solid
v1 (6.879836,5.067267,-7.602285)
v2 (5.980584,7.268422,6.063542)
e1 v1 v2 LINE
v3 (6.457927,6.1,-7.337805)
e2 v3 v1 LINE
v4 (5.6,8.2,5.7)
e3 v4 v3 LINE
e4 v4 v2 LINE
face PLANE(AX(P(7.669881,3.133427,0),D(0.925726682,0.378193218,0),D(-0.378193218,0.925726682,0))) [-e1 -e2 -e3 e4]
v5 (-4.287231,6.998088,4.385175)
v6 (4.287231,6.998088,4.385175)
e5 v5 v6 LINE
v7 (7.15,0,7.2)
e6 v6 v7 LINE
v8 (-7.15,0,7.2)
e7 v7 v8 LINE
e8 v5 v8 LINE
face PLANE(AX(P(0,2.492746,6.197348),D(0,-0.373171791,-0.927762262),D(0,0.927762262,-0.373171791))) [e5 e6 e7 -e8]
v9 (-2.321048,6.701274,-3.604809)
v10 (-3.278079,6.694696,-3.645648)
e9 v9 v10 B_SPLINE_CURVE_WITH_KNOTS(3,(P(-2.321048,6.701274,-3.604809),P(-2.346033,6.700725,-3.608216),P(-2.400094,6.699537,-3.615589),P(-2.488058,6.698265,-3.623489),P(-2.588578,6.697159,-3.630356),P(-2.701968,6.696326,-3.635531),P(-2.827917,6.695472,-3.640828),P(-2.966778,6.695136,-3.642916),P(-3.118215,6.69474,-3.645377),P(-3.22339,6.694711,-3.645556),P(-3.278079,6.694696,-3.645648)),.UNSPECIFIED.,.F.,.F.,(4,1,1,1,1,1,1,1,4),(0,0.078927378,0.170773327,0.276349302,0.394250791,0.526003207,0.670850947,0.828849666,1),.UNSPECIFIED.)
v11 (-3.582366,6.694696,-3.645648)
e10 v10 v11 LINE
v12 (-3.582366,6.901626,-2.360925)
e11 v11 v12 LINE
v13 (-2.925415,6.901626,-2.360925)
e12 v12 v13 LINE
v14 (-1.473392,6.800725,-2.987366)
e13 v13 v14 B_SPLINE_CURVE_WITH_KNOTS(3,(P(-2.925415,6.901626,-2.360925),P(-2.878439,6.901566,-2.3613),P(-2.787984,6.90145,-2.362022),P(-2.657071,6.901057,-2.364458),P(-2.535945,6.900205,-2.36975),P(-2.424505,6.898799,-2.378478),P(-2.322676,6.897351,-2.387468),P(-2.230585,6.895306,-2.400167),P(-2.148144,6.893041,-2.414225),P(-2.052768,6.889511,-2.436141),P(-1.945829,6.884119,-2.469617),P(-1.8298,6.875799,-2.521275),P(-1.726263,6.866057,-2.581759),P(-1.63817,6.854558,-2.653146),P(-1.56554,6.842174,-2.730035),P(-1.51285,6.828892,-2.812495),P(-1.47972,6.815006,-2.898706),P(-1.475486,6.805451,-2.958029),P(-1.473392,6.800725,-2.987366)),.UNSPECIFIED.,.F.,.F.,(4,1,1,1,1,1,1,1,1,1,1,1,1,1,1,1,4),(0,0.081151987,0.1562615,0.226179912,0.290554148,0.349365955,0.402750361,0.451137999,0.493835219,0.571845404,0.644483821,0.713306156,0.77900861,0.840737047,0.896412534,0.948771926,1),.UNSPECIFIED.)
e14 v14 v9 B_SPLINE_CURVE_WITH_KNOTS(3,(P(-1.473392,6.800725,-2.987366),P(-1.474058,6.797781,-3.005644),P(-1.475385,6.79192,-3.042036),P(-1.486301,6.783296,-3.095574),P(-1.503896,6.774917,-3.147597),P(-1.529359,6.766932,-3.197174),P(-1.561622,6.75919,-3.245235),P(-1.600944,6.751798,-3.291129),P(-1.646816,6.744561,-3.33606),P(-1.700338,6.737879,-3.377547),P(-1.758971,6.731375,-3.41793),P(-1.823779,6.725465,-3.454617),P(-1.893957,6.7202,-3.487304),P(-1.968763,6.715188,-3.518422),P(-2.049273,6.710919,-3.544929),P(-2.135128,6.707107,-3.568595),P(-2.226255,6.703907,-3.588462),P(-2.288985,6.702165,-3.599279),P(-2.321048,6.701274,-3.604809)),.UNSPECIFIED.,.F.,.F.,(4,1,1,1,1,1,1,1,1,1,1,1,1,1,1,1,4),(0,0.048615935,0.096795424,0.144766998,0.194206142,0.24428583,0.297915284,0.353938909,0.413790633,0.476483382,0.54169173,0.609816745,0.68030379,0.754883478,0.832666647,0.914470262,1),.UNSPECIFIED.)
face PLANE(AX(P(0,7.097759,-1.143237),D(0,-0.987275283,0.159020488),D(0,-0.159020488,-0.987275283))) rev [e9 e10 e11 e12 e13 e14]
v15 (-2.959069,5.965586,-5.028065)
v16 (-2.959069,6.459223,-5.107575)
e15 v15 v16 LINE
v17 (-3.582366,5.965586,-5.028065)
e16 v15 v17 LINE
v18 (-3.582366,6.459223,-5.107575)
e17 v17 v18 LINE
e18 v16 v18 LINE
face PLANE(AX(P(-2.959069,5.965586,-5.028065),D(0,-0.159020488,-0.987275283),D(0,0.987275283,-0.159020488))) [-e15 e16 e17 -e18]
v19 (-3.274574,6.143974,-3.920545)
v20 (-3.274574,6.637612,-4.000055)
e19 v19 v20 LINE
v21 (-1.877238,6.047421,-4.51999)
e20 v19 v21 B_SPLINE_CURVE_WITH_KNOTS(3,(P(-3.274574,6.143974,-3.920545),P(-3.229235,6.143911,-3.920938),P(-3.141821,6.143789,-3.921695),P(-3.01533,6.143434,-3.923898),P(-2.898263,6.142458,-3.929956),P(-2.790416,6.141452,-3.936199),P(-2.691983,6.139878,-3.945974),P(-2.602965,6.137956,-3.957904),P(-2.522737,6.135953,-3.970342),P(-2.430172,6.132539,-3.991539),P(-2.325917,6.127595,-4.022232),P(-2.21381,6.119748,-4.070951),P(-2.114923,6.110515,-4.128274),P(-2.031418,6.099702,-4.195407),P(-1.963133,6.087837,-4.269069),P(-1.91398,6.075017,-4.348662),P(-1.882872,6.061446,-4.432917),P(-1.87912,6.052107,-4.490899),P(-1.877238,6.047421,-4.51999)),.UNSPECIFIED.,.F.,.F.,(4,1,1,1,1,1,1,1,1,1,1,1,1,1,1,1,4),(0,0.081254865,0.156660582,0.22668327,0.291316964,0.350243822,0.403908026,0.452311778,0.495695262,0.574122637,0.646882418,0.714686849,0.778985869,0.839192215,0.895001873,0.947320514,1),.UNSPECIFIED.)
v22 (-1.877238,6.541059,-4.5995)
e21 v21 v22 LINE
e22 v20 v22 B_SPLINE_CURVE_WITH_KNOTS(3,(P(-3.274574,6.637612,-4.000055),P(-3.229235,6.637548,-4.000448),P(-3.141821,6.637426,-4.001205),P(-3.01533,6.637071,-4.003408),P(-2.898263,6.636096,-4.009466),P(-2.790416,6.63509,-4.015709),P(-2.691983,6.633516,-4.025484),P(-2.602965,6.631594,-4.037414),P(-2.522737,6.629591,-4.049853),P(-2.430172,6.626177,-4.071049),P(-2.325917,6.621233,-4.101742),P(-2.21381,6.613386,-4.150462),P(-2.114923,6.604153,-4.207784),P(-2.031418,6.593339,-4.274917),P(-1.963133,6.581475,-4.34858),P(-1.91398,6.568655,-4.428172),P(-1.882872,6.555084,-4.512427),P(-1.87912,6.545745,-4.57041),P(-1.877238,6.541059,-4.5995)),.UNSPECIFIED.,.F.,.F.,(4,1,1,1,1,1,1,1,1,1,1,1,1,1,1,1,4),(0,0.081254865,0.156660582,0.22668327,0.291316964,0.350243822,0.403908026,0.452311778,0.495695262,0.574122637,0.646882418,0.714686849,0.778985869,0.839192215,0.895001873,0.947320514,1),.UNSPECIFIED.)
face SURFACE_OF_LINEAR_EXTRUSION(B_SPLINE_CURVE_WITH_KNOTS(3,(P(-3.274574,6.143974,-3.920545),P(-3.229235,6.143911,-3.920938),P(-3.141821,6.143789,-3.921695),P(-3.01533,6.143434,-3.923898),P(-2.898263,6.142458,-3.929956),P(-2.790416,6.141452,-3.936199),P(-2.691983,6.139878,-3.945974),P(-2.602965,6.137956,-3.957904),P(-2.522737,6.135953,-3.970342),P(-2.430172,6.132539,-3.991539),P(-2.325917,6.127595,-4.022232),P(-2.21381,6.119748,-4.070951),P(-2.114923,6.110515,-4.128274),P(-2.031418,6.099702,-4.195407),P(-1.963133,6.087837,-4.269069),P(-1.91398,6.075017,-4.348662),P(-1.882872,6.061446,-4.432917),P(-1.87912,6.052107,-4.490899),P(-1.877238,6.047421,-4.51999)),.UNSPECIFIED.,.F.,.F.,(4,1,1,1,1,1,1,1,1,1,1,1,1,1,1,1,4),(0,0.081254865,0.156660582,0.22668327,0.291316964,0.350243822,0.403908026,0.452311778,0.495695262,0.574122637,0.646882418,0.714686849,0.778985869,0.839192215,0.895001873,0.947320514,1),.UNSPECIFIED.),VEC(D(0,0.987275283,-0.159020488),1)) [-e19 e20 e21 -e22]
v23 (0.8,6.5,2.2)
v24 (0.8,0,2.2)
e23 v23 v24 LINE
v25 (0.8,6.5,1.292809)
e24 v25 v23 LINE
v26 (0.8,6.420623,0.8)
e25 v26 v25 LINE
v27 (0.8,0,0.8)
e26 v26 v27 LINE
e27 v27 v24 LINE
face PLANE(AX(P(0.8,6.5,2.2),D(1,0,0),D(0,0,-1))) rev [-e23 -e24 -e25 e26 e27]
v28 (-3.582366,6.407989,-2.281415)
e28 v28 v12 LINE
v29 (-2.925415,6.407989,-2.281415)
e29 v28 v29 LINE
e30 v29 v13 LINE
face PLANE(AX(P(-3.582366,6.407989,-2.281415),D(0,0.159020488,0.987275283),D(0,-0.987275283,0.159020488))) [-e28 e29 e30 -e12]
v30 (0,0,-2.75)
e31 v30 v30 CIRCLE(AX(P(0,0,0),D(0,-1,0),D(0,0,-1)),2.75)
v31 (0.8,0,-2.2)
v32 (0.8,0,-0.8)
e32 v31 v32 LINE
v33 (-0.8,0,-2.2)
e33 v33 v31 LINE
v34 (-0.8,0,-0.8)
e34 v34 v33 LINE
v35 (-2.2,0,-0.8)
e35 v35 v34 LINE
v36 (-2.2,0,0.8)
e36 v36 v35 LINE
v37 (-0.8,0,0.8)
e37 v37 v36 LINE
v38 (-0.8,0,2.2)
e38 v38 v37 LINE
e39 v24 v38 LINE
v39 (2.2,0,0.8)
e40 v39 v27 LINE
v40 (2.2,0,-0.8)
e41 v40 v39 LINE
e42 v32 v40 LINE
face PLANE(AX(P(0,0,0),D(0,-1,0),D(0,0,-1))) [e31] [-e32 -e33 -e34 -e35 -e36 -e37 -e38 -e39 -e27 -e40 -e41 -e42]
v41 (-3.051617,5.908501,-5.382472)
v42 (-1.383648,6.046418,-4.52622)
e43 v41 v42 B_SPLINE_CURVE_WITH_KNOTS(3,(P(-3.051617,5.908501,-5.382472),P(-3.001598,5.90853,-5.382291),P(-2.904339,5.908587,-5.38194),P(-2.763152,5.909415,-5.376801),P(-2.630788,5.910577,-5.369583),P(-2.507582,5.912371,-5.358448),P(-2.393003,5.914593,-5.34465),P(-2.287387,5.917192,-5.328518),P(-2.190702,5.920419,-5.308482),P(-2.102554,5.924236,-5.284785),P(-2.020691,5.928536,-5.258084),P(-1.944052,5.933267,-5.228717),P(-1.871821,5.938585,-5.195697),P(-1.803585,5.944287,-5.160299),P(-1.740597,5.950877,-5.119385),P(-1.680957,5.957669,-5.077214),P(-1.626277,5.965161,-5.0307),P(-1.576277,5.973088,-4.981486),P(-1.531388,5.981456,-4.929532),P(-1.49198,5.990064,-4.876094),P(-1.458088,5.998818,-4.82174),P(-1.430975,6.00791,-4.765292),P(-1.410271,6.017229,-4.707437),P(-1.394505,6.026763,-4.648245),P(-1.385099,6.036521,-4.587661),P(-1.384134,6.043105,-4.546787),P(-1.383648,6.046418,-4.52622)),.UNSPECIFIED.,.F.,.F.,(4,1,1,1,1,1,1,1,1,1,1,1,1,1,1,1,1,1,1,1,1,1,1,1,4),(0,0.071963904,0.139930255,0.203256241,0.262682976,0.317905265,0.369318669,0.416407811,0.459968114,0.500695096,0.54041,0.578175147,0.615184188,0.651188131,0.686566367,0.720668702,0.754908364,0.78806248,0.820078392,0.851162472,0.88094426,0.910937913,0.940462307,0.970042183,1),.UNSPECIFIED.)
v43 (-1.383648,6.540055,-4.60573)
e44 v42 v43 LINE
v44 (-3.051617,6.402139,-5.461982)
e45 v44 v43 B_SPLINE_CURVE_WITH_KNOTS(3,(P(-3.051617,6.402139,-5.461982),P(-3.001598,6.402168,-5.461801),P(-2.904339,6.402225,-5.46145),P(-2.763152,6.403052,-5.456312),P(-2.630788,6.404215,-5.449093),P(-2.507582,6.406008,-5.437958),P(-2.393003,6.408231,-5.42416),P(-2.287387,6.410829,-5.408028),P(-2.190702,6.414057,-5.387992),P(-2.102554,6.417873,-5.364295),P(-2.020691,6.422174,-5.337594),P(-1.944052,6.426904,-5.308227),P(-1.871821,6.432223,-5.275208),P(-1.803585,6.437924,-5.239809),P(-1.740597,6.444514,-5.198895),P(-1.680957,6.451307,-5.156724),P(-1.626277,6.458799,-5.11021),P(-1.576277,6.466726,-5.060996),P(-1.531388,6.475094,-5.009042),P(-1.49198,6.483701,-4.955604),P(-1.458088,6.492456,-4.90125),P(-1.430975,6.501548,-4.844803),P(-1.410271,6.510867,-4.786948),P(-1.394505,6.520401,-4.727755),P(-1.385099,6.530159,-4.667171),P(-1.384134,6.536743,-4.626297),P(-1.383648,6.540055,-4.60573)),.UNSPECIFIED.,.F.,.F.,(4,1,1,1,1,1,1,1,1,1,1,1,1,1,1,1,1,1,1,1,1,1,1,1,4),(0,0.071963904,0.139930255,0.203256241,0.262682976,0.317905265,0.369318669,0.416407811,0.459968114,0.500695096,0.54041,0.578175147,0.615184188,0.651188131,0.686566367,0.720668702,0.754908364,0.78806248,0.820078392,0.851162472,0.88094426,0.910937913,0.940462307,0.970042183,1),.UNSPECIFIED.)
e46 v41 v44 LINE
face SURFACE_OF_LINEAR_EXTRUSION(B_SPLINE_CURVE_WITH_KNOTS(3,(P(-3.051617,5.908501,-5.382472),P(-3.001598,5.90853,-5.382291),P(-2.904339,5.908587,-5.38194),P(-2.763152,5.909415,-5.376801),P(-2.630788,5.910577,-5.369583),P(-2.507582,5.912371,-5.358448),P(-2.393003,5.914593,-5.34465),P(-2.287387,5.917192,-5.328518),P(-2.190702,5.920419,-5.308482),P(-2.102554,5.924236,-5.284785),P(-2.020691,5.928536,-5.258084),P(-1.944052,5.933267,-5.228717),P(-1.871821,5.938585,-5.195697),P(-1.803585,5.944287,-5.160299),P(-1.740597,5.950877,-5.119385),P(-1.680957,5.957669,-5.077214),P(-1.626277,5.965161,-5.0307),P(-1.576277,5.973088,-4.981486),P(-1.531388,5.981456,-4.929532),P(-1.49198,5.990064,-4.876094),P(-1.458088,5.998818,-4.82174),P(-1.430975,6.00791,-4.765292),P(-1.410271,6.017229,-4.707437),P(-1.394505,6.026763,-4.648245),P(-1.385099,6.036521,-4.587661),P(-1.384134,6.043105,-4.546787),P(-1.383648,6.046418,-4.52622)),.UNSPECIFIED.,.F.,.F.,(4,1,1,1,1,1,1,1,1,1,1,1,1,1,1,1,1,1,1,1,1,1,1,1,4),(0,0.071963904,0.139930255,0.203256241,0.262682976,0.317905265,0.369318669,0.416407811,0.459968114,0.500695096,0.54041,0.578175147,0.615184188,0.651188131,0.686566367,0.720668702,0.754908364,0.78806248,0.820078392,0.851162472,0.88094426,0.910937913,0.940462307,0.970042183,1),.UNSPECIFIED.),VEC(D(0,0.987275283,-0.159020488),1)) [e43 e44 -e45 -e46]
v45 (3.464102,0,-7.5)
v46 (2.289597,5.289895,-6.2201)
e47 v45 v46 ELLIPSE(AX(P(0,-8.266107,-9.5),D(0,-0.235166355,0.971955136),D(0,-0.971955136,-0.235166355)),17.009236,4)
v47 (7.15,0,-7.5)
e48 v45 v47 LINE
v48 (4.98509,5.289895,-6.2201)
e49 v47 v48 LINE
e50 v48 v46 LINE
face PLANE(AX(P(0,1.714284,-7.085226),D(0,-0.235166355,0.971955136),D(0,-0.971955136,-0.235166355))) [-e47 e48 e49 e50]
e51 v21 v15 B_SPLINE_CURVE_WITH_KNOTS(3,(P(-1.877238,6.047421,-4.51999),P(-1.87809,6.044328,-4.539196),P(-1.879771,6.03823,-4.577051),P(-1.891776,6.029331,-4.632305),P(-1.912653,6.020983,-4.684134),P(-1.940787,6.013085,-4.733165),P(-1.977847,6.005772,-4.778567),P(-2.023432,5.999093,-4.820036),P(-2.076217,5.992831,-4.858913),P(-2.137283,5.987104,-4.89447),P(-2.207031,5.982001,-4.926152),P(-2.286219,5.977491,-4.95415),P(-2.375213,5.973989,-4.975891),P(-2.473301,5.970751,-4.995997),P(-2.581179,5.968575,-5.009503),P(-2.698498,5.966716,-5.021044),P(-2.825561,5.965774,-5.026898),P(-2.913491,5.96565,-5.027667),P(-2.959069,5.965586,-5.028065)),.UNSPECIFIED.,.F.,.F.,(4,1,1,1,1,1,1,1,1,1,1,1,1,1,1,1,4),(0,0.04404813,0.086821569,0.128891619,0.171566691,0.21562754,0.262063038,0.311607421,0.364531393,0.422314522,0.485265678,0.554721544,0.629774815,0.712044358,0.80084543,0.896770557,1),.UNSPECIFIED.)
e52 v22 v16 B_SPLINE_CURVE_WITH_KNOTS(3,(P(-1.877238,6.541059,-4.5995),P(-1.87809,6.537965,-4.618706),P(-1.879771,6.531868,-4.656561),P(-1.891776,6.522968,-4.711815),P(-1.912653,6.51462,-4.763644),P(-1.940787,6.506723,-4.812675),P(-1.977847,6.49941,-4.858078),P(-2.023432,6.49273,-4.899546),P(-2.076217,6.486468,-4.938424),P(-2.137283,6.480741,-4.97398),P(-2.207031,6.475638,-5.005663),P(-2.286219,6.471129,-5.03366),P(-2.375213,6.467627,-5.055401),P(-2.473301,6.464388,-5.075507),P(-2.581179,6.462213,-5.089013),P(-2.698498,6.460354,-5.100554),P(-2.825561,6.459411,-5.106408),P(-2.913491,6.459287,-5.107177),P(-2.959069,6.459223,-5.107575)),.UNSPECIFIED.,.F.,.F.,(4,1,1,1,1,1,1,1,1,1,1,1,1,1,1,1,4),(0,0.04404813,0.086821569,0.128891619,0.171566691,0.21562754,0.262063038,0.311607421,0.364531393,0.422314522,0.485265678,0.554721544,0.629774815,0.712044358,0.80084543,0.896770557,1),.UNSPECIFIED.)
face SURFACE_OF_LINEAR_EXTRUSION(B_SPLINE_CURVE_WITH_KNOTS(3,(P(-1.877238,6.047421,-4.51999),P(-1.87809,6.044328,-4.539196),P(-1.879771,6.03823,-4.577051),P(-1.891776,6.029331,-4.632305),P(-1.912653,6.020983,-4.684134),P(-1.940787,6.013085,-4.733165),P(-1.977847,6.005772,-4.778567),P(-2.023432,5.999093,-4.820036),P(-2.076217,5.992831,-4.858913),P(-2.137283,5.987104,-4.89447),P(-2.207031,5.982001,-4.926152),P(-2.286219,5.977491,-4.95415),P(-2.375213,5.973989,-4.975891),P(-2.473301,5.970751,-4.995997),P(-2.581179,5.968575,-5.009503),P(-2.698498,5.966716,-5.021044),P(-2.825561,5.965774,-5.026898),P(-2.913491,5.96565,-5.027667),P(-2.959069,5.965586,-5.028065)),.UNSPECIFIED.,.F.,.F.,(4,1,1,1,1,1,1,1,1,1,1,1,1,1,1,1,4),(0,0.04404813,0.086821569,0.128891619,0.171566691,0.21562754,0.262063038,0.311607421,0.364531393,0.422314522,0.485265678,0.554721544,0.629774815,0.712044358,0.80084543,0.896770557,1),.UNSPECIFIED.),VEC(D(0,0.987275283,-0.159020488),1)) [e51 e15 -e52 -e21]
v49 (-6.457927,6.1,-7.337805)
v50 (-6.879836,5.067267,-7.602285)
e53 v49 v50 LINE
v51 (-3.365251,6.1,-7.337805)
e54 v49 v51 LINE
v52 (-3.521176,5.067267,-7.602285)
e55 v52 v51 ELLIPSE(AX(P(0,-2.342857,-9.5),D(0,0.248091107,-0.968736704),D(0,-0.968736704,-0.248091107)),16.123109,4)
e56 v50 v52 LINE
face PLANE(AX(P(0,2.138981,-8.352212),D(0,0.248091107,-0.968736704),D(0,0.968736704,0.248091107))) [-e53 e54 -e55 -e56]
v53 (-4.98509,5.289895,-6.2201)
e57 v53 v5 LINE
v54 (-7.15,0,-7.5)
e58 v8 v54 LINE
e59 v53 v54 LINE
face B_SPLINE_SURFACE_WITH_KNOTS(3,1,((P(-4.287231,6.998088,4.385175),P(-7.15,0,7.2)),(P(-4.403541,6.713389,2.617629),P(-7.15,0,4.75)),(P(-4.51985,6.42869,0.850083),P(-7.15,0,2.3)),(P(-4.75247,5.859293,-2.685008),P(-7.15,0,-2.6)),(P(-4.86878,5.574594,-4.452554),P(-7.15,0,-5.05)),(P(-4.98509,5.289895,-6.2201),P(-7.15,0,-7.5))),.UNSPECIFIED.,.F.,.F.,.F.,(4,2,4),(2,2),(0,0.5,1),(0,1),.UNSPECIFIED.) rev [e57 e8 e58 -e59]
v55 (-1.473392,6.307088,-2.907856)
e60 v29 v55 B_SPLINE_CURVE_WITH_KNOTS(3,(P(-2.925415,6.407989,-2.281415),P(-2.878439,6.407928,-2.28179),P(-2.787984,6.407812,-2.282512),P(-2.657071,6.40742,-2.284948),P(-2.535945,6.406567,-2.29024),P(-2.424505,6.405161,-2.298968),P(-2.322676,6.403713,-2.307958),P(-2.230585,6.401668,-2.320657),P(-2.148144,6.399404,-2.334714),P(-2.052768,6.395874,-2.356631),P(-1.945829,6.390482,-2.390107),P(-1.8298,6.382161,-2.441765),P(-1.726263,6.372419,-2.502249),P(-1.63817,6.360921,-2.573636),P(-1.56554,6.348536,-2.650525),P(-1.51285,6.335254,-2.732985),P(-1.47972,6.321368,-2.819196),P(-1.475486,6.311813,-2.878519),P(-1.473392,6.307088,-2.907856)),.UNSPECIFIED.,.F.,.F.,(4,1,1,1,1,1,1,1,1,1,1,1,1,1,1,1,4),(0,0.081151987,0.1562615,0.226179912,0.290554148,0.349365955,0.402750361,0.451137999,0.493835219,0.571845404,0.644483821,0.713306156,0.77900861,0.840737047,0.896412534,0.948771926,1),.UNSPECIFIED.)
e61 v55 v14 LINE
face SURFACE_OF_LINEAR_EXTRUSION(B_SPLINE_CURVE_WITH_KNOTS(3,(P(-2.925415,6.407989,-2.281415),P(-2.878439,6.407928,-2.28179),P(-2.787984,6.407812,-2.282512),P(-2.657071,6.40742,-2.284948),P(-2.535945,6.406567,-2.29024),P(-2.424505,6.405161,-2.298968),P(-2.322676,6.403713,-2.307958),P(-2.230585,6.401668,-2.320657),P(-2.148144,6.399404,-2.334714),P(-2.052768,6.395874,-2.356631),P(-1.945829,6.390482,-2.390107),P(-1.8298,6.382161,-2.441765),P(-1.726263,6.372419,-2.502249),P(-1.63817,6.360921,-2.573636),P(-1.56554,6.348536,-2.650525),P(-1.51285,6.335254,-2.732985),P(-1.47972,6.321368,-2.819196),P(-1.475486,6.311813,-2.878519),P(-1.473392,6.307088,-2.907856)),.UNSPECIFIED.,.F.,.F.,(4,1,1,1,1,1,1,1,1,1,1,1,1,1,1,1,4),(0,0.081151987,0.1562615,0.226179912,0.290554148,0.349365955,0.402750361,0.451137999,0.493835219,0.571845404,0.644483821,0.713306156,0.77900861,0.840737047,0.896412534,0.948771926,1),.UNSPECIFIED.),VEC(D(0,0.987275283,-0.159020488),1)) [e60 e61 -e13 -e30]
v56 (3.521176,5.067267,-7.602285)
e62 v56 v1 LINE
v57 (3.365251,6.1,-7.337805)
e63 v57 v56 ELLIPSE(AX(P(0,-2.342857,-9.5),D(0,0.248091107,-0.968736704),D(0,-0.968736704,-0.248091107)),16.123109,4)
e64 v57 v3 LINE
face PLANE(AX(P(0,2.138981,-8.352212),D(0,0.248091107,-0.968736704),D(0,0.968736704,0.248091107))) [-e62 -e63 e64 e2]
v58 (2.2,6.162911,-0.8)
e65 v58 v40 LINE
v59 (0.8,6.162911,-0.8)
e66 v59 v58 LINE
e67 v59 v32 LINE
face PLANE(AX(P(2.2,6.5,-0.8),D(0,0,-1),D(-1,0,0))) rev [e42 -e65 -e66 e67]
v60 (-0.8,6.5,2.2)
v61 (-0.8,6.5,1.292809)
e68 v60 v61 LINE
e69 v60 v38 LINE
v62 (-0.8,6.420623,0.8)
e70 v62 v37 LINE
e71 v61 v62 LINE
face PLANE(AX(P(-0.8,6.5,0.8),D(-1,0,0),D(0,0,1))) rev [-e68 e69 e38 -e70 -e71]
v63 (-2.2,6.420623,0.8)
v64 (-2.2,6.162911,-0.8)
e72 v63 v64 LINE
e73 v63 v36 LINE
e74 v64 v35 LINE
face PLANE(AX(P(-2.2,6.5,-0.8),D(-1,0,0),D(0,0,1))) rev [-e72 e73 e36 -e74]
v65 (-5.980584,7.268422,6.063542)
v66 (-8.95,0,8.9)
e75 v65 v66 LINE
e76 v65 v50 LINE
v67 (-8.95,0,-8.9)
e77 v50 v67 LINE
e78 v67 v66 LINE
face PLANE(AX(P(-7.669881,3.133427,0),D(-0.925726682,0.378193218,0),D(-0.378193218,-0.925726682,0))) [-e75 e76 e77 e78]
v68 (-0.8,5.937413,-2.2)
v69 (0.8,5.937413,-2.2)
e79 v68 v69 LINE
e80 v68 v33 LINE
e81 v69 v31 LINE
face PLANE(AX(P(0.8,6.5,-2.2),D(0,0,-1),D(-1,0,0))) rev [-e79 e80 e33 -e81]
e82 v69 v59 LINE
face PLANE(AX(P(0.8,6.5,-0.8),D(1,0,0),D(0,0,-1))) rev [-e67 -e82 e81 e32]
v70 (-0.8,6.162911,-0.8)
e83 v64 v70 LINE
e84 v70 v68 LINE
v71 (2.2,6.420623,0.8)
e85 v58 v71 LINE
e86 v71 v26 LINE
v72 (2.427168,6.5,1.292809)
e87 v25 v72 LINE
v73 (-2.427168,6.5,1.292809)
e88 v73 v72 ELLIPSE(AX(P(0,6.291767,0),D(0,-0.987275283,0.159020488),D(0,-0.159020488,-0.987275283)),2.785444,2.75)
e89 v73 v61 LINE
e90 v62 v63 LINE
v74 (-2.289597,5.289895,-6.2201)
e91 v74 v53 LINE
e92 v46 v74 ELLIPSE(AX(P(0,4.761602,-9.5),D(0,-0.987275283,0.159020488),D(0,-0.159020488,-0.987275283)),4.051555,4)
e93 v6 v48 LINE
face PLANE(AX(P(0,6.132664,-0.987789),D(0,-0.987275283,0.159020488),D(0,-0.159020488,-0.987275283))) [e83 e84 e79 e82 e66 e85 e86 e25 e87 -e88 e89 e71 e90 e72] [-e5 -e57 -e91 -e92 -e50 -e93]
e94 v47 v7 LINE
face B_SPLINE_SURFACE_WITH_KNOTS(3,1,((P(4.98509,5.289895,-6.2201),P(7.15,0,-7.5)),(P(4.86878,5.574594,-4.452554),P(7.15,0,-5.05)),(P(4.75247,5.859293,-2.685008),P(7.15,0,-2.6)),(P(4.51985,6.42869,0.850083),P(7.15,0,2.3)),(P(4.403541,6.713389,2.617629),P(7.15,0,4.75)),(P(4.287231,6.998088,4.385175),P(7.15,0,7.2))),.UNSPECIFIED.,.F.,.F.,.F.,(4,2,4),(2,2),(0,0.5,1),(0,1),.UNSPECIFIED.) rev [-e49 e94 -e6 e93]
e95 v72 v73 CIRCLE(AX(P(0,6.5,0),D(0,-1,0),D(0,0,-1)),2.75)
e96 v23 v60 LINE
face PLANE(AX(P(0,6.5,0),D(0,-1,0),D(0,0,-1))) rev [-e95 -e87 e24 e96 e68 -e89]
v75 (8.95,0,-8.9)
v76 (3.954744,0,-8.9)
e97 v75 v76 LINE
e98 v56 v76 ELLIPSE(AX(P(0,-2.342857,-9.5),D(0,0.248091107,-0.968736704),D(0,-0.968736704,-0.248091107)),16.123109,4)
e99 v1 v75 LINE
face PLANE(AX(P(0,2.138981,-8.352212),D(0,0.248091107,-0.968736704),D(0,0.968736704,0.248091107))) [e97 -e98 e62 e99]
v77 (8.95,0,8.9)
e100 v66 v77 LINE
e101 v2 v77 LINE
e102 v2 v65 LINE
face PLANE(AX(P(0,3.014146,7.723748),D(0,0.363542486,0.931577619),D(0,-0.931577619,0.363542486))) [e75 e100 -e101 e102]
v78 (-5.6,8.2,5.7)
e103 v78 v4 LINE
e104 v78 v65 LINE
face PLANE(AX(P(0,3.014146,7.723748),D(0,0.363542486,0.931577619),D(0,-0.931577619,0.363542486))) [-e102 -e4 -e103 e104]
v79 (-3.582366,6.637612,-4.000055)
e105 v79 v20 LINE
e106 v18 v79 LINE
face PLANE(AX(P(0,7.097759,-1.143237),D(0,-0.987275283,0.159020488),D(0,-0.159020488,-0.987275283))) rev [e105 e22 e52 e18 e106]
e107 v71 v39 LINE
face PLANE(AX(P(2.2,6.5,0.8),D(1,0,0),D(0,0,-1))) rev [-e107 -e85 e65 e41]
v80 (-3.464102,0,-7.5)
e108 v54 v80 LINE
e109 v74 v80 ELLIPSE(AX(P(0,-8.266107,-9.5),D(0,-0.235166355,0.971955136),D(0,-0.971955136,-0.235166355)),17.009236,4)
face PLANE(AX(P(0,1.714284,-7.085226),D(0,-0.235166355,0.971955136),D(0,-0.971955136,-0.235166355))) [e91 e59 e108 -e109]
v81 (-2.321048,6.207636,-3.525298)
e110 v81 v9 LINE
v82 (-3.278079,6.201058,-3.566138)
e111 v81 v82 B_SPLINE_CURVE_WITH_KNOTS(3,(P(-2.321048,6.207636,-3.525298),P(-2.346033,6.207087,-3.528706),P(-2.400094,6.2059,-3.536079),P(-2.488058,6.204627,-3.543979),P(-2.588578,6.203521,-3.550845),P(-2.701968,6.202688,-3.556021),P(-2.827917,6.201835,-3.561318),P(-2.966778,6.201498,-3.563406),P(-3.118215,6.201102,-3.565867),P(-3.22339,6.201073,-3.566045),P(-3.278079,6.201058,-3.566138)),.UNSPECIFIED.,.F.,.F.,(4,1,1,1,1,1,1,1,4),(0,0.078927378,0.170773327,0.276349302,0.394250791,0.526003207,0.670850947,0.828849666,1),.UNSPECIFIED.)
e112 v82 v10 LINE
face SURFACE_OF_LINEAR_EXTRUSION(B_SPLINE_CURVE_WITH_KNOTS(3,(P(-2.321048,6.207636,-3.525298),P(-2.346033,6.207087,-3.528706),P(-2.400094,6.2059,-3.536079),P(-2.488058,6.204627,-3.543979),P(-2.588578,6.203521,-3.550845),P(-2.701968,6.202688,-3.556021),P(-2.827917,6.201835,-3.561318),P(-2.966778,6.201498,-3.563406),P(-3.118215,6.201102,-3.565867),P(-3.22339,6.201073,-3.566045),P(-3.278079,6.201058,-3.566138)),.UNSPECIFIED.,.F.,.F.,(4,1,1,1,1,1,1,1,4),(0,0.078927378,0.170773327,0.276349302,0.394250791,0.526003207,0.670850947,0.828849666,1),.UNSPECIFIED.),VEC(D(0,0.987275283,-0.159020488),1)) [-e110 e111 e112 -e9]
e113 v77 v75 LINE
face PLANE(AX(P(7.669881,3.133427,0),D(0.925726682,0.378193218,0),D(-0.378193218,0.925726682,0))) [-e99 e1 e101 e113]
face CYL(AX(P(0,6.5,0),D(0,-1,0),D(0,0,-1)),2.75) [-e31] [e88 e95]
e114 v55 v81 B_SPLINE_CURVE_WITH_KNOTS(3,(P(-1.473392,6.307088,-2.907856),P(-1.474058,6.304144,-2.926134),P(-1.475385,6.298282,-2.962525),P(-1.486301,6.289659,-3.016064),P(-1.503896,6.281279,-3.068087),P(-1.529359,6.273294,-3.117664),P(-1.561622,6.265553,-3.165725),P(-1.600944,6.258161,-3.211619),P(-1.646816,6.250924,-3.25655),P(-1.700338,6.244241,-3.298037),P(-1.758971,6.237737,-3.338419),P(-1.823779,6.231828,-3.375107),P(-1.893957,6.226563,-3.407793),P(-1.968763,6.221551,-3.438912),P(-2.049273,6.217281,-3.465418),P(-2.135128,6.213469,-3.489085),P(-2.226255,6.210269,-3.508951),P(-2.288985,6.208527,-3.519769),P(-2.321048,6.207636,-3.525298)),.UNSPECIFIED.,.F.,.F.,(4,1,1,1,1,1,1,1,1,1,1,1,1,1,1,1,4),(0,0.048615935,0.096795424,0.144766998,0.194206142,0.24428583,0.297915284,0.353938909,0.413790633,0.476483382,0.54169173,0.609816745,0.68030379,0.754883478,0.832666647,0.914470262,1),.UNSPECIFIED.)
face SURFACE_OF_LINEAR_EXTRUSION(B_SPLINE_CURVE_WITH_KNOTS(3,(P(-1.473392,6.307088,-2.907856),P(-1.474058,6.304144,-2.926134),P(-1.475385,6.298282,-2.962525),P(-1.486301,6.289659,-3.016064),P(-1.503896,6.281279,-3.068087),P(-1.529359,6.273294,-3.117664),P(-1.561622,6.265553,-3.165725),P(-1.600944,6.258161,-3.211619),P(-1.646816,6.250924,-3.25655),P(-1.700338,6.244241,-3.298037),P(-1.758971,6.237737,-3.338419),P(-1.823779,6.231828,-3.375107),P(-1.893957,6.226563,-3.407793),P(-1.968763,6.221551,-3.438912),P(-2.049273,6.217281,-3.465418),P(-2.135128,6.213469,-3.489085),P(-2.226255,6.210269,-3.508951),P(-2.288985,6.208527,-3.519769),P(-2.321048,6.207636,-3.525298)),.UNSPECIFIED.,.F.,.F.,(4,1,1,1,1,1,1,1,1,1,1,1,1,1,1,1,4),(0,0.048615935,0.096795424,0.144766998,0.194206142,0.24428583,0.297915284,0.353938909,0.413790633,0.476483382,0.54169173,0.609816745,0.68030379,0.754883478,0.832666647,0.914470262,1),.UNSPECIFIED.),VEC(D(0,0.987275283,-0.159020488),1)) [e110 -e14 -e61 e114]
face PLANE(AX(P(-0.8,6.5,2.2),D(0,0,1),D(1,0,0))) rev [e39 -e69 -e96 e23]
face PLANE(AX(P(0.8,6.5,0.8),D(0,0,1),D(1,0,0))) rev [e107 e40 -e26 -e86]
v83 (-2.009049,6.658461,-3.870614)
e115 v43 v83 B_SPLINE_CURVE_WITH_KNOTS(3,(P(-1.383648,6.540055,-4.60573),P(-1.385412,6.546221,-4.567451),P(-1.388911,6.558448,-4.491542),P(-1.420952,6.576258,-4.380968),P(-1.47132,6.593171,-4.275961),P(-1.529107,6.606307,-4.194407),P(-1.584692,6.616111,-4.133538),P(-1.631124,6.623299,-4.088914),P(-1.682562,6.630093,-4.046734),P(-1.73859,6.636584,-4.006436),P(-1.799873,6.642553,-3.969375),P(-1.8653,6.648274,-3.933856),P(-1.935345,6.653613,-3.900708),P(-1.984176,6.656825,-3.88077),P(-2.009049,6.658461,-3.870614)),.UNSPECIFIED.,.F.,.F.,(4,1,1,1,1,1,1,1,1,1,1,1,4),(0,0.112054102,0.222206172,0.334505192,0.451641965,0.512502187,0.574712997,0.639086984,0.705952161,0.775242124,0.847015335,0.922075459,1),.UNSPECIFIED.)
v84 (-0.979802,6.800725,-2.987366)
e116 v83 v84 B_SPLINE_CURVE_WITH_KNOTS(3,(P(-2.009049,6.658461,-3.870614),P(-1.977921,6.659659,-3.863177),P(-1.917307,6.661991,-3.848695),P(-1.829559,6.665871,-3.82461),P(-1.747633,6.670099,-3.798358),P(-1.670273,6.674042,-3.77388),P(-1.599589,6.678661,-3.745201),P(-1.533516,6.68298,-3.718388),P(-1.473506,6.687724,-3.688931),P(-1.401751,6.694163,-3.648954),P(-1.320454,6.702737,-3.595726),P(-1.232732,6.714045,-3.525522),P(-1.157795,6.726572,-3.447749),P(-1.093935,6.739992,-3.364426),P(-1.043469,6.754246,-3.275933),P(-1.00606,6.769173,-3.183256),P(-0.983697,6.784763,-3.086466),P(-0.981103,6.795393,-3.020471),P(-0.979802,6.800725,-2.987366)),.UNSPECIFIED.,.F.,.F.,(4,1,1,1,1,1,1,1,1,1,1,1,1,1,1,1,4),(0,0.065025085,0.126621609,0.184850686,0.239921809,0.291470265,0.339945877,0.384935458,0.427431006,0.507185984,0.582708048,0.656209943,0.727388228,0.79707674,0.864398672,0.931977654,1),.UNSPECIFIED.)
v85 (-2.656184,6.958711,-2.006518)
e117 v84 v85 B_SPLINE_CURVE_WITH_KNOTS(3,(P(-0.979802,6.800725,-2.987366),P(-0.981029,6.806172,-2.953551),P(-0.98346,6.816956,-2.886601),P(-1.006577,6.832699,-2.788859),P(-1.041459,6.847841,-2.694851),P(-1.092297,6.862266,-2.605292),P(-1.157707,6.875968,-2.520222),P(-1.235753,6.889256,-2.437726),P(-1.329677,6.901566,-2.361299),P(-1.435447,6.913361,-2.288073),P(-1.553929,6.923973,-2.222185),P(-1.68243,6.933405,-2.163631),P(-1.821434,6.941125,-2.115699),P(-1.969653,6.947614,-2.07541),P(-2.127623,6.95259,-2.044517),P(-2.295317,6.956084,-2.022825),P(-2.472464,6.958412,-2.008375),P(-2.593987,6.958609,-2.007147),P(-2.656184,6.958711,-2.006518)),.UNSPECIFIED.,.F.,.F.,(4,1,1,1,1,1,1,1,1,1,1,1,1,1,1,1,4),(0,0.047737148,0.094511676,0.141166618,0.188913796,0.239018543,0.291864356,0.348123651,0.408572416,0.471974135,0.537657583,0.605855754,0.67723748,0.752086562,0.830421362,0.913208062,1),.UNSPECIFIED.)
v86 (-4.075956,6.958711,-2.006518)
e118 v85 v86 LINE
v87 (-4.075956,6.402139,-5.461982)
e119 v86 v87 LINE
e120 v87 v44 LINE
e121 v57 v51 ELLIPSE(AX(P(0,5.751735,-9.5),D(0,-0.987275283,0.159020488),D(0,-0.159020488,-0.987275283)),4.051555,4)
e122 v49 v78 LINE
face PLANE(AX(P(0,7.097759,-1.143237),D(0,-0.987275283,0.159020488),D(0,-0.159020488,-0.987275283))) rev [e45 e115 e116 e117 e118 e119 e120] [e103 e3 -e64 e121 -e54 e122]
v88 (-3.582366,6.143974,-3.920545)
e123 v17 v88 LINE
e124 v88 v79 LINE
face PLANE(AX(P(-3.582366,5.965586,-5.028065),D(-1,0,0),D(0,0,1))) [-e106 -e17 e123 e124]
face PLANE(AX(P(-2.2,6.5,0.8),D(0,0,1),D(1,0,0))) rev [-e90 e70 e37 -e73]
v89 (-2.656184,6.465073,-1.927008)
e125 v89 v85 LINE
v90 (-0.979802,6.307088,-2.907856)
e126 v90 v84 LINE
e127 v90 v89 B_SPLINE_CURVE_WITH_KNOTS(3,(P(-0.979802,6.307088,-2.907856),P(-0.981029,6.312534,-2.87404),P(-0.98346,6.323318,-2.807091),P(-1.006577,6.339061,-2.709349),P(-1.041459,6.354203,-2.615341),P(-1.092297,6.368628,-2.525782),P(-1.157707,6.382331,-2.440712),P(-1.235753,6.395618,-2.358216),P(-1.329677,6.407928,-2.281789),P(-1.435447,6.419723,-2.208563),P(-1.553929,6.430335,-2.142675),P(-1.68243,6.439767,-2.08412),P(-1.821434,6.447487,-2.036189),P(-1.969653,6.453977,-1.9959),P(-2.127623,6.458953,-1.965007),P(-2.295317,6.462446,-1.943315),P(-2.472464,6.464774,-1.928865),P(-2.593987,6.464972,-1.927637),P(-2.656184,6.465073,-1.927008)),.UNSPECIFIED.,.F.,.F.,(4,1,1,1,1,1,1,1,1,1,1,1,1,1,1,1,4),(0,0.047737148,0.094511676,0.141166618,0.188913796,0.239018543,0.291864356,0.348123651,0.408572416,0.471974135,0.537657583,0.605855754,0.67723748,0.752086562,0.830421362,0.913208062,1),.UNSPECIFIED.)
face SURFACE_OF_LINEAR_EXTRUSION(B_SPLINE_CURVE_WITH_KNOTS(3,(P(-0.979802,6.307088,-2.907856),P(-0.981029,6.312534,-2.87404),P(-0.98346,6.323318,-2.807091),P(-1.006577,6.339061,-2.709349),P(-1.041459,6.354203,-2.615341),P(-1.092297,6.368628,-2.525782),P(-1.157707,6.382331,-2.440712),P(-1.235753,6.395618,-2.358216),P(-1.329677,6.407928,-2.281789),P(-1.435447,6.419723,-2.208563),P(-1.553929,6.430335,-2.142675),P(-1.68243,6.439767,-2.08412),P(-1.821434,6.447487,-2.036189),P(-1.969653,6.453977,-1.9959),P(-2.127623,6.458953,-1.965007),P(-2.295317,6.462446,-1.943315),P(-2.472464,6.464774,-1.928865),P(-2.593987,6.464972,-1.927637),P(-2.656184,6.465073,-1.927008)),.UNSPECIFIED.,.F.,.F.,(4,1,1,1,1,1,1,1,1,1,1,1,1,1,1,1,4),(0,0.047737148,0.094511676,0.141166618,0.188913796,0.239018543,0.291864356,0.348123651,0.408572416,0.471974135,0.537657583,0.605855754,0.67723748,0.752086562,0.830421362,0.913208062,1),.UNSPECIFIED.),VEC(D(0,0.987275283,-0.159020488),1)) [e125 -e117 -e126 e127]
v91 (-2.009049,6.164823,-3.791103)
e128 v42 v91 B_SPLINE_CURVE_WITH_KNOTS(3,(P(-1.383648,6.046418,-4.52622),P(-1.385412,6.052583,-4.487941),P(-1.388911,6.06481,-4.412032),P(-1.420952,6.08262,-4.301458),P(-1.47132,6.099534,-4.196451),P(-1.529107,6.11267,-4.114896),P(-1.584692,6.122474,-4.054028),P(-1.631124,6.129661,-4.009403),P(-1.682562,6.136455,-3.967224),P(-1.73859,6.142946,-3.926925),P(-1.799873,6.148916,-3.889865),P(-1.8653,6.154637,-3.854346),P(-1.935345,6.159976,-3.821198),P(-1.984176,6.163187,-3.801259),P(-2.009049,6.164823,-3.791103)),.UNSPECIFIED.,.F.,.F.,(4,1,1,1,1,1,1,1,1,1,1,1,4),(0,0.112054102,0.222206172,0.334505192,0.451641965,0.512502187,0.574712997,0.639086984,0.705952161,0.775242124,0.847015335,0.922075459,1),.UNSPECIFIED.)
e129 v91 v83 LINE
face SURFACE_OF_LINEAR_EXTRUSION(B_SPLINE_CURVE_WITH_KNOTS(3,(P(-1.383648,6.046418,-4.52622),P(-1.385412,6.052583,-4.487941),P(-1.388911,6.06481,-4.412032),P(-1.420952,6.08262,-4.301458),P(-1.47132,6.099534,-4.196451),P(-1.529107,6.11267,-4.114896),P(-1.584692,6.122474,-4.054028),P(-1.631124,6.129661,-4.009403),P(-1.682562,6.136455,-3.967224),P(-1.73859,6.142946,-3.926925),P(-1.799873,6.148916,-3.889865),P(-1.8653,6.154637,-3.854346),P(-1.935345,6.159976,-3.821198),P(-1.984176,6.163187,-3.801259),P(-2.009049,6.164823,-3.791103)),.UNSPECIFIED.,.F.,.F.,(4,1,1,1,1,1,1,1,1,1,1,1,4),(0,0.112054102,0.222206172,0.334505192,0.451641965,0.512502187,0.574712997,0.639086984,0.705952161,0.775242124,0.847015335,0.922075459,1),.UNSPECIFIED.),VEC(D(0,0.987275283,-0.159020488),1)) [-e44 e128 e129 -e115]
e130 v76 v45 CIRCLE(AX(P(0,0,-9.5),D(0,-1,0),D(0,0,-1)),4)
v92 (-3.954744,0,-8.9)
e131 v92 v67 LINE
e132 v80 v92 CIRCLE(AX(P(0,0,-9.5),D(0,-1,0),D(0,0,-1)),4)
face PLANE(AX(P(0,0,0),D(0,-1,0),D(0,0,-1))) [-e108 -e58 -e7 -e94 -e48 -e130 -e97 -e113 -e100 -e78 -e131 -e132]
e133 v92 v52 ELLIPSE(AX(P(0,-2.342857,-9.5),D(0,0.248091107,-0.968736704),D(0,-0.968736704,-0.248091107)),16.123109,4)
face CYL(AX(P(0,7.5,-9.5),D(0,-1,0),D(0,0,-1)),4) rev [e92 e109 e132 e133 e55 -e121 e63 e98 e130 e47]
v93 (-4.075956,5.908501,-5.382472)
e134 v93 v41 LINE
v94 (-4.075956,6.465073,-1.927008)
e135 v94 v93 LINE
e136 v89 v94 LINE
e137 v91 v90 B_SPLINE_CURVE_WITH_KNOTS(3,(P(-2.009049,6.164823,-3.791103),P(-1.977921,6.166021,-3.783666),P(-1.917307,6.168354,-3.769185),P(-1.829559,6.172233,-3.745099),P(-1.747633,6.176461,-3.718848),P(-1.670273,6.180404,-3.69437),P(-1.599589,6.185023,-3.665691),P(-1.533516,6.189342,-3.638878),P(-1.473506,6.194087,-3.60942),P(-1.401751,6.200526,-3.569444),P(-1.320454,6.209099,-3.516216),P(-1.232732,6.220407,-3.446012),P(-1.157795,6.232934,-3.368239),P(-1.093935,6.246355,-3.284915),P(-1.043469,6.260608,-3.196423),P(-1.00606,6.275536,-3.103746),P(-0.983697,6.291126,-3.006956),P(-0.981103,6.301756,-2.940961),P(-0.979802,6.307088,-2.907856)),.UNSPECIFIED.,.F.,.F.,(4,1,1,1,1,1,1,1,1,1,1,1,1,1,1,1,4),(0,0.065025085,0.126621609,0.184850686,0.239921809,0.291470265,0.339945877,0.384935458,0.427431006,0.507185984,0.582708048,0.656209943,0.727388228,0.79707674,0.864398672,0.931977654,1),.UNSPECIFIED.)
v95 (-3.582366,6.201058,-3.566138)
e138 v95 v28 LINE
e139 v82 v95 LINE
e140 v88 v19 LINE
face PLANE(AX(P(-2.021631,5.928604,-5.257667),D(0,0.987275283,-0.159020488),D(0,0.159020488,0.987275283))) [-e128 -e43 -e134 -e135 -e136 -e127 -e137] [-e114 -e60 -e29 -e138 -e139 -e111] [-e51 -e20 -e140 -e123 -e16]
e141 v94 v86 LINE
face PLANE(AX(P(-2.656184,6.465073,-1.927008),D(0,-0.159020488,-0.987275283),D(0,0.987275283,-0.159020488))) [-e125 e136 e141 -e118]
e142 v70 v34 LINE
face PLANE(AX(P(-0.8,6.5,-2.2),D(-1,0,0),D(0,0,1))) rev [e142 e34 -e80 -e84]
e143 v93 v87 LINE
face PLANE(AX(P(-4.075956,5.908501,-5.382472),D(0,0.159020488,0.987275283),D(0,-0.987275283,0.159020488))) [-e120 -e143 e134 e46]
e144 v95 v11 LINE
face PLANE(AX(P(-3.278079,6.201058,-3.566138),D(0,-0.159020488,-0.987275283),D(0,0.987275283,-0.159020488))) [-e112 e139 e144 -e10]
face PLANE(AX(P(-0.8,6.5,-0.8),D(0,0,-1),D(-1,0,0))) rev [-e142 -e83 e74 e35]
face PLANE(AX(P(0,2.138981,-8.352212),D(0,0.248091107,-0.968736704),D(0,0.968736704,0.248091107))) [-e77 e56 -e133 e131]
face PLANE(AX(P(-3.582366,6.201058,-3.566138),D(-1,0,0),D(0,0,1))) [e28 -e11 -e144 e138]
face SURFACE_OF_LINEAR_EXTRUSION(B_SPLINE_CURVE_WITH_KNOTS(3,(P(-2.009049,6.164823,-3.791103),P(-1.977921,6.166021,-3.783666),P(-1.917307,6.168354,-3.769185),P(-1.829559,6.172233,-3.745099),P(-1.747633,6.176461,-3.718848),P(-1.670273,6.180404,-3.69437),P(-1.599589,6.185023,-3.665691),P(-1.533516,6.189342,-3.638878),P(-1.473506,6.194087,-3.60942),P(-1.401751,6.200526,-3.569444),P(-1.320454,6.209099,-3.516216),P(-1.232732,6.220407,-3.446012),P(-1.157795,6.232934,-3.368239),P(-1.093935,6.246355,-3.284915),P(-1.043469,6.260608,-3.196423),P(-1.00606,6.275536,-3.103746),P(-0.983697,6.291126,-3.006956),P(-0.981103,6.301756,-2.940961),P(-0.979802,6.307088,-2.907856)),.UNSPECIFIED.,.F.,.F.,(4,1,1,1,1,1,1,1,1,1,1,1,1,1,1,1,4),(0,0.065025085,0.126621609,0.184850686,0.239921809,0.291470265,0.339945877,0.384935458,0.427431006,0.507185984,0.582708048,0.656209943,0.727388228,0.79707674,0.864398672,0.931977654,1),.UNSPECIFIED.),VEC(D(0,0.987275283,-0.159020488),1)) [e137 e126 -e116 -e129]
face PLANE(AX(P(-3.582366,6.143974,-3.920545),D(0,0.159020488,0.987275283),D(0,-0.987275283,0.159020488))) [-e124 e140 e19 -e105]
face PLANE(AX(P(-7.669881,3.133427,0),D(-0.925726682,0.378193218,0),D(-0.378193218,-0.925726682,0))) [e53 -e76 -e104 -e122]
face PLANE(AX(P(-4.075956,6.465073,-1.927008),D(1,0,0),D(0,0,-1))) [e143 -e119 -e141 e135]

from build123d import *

# Parameters (mm, degrees)
OTHER_START         = 7.189240539
OTHER_2_OUTLINE_W   = 16
OTHER_2_OUTLINE_H   = 16
OTHER_2_DEPTH       = 1.9877561
SKETCH_20_R         = 2.75
EXTRUDE_2_DEPTH     = 6.5
CUT_EXTRUDE_1_DEPTH = 0.5
SKETCH_22_R         = 4
CUT_EXTRUDE_2_DEPTH = 7.5


# Read off the part's stored shape, not the designer's step: 相交2
with BuildPart() as part:
    # 草图4 → Loft 1 section 0
    with BuildSketch(Plane(origin=(0, 8.2, 0), x_dir=(1, 0, 0), z_dir=(0, 1, 0))):
        with BuildLine():
            Line((-5.6, 6.8), (5.6, 6.8))
            Line((5.6, 6.8), (5.6, -5.7))
            Line((5.6, -5.7), (-5.6, -5.7))
            Line((-5.6, -5.7), (-5.6, 6.8))
        make_face()
    # 草图1 → Loft 1 section 1
    with BuildSketch(Plane(origin=(0, 0, 0), x_dir=(1, 0, 0), z_dir=(0, 1, 0))):
        with BuildLine():
            Line((-8.95, -8.9), (8.95, -8.9))
            Line((8.95, -8.9), (8.95, 8.9))
            Line((8.95, 8.9), (-8.95, 8.9))
            Line((-8.95, 8.9), (-8.95, -8.9))
        make_face()
    loft()

    # 相交2 outline → 相交2 (cut)
    with BuildSketch(Plane(origin=(0, 0, 0), x_dir=(1, 0, 0), z_dir=(0, 0.9872752829851917, -0.15902048800865198)).offset(OTHER_START)):
        Rectangle(OTHER_2_OUTLINE_W, OTHER_2_OUTLINE_H)
    extrude(amount=OTHER_2_DEPTH, mode=Mode.SUBTRACT)

    # 草图19 → Loft 1 2 section 0
    with BuildSketch(Plane(origin=(0, 6.132664073, -0.987788564), x_dir=(1, 0, 0), z_dir=(0, 0.9872752829851916, -0.15902048800865207))):
        with BuildLine():
            Line((-4.985089723, 5.299749211), (4.985089723, 5.299749211))
            Line((4.985089723, 5.299749211), (4.287230721, -5.442213697))
            Line((4.287230721, -5.442213697), (-4.287230721, -5.442213697))
            Line((-4.287230721, -5.442213697), (-4.985089723, 5.299749211))
        make_face()
    # 草图8 → Loft 1 2 section 1
    with BuildSketch(Plane.XZ):
        with BuildLine():
            Line((-7.15, 7.2), (7.15, 7.2))
            Line((7.15, 7.2), (7.15, -7.5))
            Line((7.15, -7.5), (-7.15, -7.5))
            Line((-7.15, -7.5), (-7.15, 7.2))
        make_face()
    loft(mode=Mode.SUBTRACT)

    # 草图20 → 凸台-拉伸2 (add)
    with BuildSketch(Plane.XZ):
        with Locations(Location((0, 0, 0), (0, 0, 270))):
            Circle(SKETCH_20_R)
        Polygon((-2.2, 0.8), (-0.8, 0.8), (-0.8, 2.2), (0.8, 2.2), (0.8, 0.8), (2.2, 0.8), (2.2, -0.8), (0.8, -0.8), (0.8, -2.2), (-0.8, -2.2), (-0.8, -0.8), (-2.2, -0.8), align=None, mode=Mode.SUBTRACT)
    extrude(amount=-EXTRUDE_2_DEPTH)

    # 草图21 → 切除-拉伸1 (cut)
    with BuildSketch(Plane(origin=(0, 7.097759487, -1.143236539), x_dir=(1, 0, 0), z_dir=(0, 0.9872752829851916, -0.15902048800865207))):
        with BuildLine():
            Line((-4.075955723, 4.374408411), (-3.05161678, 4.374408411))
            add(Edge.make_bspline(
                [(-3.05161678, 4.374408411), (-3.001598177, 4.37422557), (-2.904339475, 4.373870045), (-2.763152441, 4.368665036), (-2.630787829, 4.361353255), (-2.507581664, 4.350074843), (-2.393003416, 4.336098995), (-2.287386768, 4.319759613), (-2.190702321, 4.299464771), (-2.102553843, 4.275462633), (-2.02069076, 4.248417722), (-1.944052325, 4.218671859), (-1.871820937, 4.185226888), (-1.803585437, 4.149371864), (-1.740597017, 4.107930824), (-1.680956816, 4.065216099), (-1.626276856, 4.018102997), (-1.576276747, 3.968254753), (-1.53138788, 3.915631236), (-1.491980376, 3.861504021), (-1.458087704, 3.806449275), (-1.43097458, 3.749274429), (-1.410270719, 3.690673858), (-1.394505384, 3.630718089), (-1.385098589, 3.56935381), (-1.384133592, 3.527952708), (-1.38364803, 3.50712075)],
                knots=[0, 0, 0, 0, 1.727133696, 3.358326119, 4.878149777, 6.304391432, 7.629726349, 8.863648063, 9.993787461, 11.039234741, 12.016682314, 12.969840003, 13.87620352, 14.764420512, 15.628515143, 16.477592799, 17.296048855, 18.117800747, 18.913499522, 19.681881416, 20.427899323, 21.142662237, 21.862509911, 22.571095379, 23.281012387, 24, 24, 24, 24], degree=3))
            add(Edge.make_bspline(
                [(-1.38364803, 3.50712075), (-1.385412282, 3.468348204), (-1.388910839, 3.391461246), (-1.42095224, 3.279461488), (-1.471320058, 3.173101493), (-1.529107281, 3.090495822), (-1.584691676, 3.028842776), (-1.631123728, 2.983643069), (-1.682562114, 2.940920335), (-1.738589565, 2.900102161), (-1.799873027, 2.862563579), (-1.865299808, 2.826587473), (-1.935344564, 2.793012224), (-1.98417587, 2.77281639), (-2.009048671, 2.762529404)],
                knots=[0, 0, 0, 0, 1.344649222, 2.666474061, 4.014062304, 5.41970358, 6.150026244, 6.896555969, 7.669043806, 8.471425933, 9.302905494, 10.164184025, 11.06490551, 12, 12, 12, 12], degree=3))
            add(Edge.make_bspline(
                [(-2.009048671, 2.762529404), (-1.977920981, 2.754996611), (-1.917306862, 2.740328204), (-1.829559386, 2.715932573), (-1.747632696, 2.689342975), (-1.670272781, 2.664549503), (-1.599588756, 2.635500242), (-1.533515625, 2.608342187), (-1.473506413, 2.578504898), (-1.401750644, 2.538013126), (-1.320454432, 2.484098783), (-1.232731939, 2.412990017), (-1.157794968, 2.334214687), (-1.093935011, 2.249817411), (-1.043468641, 2.160184049), (-1.006060497, 2.066312746), (-0.983696742, 1.968275226), (-0.981102992, 1.901429924), (-0.979801877, 1.867897994)],
                knots=[0, 0, 0, 0, 1.040401352, 2.025945749, 2.957610977, 3.838748948, 4.663524247, 5.439134026, 6.158967321, 6.838896101, 8.114975742, 9.323328772, 10.499359089, 11.638211642, 12.753227844, 13.830378753, 14.911642469, 16, 16, 16, 16], degree=3))
            add(Edge.make_bspline(
                [(-0.979801877, 1.867897994), (-0.981029473, 1.833646659), (-0.983459912, 1.765834667), (-1.006577059, 1.666832464), (-1.041459332, 1.571612689), (-1.09229665, 1.480899499), (-1.157707146, 1.394733239), (-1.235753214, 1.311173804), (-1.329676927, 1.233761622), (-1.435446571, 1.159592435), (-1.553929285, 1.092855208), (-1.682429672, 1.03354565), (-1.821434347, 0.984996199), (-1.969653473, 0.944188002), (-2.12762314, 0.912897118), (-2.295317391, 0.890925288), (-2.472464022, 0.876289135), (-2.593987323, 0.875045113), (-2.656184088, 0.874408411)],
                knots=[0, 0, 0, 0, 0.763794375, 1.512186817, 2.258665885, 3.022620734, 3.824296693, 4.669829699, 5.569978408, 6.537158664, 7.551586153, 8.60252133, 9.69369207, 10.835799672, 12.033384994, 13.286741793, 14.611328995, 16, 16, 16, 16], degree=3))
            Line((-2.656184088, 0.874408411), (-4.075955723, 0.874408411))
            Line((-4.075955723, 0.874408411), (-4.075955723, 4.374408411))
        make_face()
        with BuildLine():
            Line((-3.582365979, 4.015434052), (-3.582365979, 2.89363918))
            Line((-3.582365979, 2.89363918), (-3.274573511, 2.89363918))
            add(Edge.make_bspline(
                [(-3.274573511, 2.89363918), (-3.229234608, 2.894037102), (-3.14182053, 2.894804303), (-3.015329988, 2.897035757), (-2.898263152, 2.903171565), (-2.790415727, 2.909495423), (-2.6919831, 2.919395843), (-2.602964895, 2.931479837), (-2.522737381, 2.944078774), (-2.43017236, 2.965548195), (-2.325916803, 2.996637022), (-2.213810068, 3.045984254), (-2.114923061, 3.104045743), (-2.031417989, 3.172044051), (-1.963132903, 3.246655866), (-1.913980137, 3.327274535), (-1.882872139, 3.412615332), (-1.879120194, 3.471344935), (-1.877237774, 3.500810654)],
                knots=[0, 0, 0, 0, 1.300077838, 2.506569319, 3.626932325, 4.661071425, 5.603901159, 6.462528421, 7.236988455, 7.931124199, 9.1859622, 10.350118682, 11.434989577, 12.463773904, 13.427075439, 14.32002997, 15.157128221, 16, 16, 16, 16], degree=3))
            add(Edge.make_bspline(
                [(-1.877237774, 3.500810654), (-1.878090356, 3.52026362), (-1.879770849, 3.558606611), (-1.891776361, 3.614572779), (-1.912652517, 3.667069895), (-1.94078659, 3.716733169), (-1.977847183, 3.762720595), (-2.023432155, 3.804723671), (-2.076216593, 3.844102145), (-2.137282697, 3.880116871), (-2.20703143, 3.912207698), (-2.286219485, 3.940566317), (-2.375213143, 3.962587503), (-2.473301087, 3.982952277), (-2.581178984, 3.996632495), (-2.698498063, 4.008322574), (-2.825561166, 4.014251811), (-2.913491199, 4.015030452), (-2.959068703, 4.015434052)],
                knots=[0, 0, 0, 0, 0.704770075, 1.389145107, 2.062265897, 2.745067049, 3.450040637, 4.193008615, 4.985718742, 5.832502292, 6.757032351, 7.764250842, 8.87554471, 10.07639704, 11.392709723, 12.81352688, 14.348328909, 16, 16, 16, 16], degree=3))
            Line((-2.959068703, 4.015434052), (-3.582365979, 4.015434052))
        make_face(mode=Mode.SUBTRACT)
        with BuildLine():
            Line((-3.582365979, 2.534664821), (-3.582365979, 1.23338277))
            Line((-3.582365979, 1.23338277), (-2.925414857, 1.23338277))
            add(Edge.make_bspline(
                [(-2.925414857, 1.23338277), (-2.87843879, 1.233762727), (-2.787984434, 1.23449435), (-2.657071337, 1.236961408), (-2.535944574, 1.242321818), (-2.424505301, 1.251162574), (-2.322676057, 1.260268307), (-2.230585111, 1.273130598), (-2.148143507, 1.287369469), (-2.052767711, 1.309568231), (-1.945828922, 1.343476113), (-1.829800232, 1.395799803), (-1.726263469, 1.457063537), (-1.638169932, 1.52937046), (-1.565540416, 1.607250263), (-1.512850304, 1.69077302), (-1.479720256, 1.778095564), (-1.47548575, 1.838182595), (-1.47339162, 1.867897994)],
                knots=[0, 0, 0, 0, 1.29843179, 2.500184008, 3.618878599, 4.648866362, 5.589855277, 6.444005784, 7.218207981, 7.901363496, 9.149526468, 10.311741131, 11.4128985, 12.464137763, 13.451792752, 14.342600541, 15.180350819, 16, 16, 16, 16], degree=3))
            add(Edge.make_bspline(
                [(-1.47339162, 1.867897994), (-1.474057939, 1.886411489), (-1.475384595, 1.923272276), (-1.486301385, 1.977500806), (-1.503895793, 2.030194167), (-1.529359322, 2.080409977), (-1.561622114, 2.129090654), (-1.600943659, 2.175575902), (-1.646816465, 2.221086121), (-1.700338495, 2.263107634), (-1.758970648, 2.304010862), (-1.82377859, 2.341171111), (-1.893956852, 2.374278996), (-1.96876264, 2.405798633), (-2.049273018, 2.432646906), (-2.135127862, 2.4566183), (-2.226255262, 2.476740829), (-2.288984721, 2.487698036), (-2.32104787, 2.493298635)],
                knots=[0, 0, 0, 0, 0.77785496, 1.548726791, 2.316271961, 3.107298279, 3.908573286, 4.766644542, 5.663022547, 6.620650135, 7.623734104, 8.66706768, 9.757067915, 10.884860646, 12.078135655, 13.322666349, 14.631524187, 16, 16, 16, 16], degree=3))
            add(Edge.make_bspline(
                [(-2.32104787, 2.493298635), (-2.346033301, 2.496750191), (-2.400093694, 2.504218241), (-2.488058336, 2.512220196), (-2.588577808, 2.519174973), (-2.701968389, 2.52441673), (-2.827916954, 2.529782033), (-2.96677814, 2.531897127), (-3.1182147, 2.534390125), (-3.223390168, 2.534570849), (-3.27807912, 2.534664821)],
                knots=[0, 0, 0, 0, 0.631419024, 1.366186615, 2.21079442, 3.154006331, 4.208025658, 5.366807578, 6.630797325, 8, 8, 8, 8], degree=3))
            Line((-3.27807912, 2.534664821), (-3.582365979, 2.534664821))
        make_face(mode=Mode.SUBTRACT)
    extrude(amount=-CUT_EXTRUDE_1_DEPTH, mode=Mode.SUBTRACT)

    # 草图22 → 切除-拉伸2 (cut)
    with BuildSketch(Plane.XZ):
        with Locations((0, -9.5)):
            Circle(SKETCH_22_R)
    extrude(amount=-CUT_EXTRUDE_2_DEPTH, mode=Mode.SUBTRACT)


solid = part.part
